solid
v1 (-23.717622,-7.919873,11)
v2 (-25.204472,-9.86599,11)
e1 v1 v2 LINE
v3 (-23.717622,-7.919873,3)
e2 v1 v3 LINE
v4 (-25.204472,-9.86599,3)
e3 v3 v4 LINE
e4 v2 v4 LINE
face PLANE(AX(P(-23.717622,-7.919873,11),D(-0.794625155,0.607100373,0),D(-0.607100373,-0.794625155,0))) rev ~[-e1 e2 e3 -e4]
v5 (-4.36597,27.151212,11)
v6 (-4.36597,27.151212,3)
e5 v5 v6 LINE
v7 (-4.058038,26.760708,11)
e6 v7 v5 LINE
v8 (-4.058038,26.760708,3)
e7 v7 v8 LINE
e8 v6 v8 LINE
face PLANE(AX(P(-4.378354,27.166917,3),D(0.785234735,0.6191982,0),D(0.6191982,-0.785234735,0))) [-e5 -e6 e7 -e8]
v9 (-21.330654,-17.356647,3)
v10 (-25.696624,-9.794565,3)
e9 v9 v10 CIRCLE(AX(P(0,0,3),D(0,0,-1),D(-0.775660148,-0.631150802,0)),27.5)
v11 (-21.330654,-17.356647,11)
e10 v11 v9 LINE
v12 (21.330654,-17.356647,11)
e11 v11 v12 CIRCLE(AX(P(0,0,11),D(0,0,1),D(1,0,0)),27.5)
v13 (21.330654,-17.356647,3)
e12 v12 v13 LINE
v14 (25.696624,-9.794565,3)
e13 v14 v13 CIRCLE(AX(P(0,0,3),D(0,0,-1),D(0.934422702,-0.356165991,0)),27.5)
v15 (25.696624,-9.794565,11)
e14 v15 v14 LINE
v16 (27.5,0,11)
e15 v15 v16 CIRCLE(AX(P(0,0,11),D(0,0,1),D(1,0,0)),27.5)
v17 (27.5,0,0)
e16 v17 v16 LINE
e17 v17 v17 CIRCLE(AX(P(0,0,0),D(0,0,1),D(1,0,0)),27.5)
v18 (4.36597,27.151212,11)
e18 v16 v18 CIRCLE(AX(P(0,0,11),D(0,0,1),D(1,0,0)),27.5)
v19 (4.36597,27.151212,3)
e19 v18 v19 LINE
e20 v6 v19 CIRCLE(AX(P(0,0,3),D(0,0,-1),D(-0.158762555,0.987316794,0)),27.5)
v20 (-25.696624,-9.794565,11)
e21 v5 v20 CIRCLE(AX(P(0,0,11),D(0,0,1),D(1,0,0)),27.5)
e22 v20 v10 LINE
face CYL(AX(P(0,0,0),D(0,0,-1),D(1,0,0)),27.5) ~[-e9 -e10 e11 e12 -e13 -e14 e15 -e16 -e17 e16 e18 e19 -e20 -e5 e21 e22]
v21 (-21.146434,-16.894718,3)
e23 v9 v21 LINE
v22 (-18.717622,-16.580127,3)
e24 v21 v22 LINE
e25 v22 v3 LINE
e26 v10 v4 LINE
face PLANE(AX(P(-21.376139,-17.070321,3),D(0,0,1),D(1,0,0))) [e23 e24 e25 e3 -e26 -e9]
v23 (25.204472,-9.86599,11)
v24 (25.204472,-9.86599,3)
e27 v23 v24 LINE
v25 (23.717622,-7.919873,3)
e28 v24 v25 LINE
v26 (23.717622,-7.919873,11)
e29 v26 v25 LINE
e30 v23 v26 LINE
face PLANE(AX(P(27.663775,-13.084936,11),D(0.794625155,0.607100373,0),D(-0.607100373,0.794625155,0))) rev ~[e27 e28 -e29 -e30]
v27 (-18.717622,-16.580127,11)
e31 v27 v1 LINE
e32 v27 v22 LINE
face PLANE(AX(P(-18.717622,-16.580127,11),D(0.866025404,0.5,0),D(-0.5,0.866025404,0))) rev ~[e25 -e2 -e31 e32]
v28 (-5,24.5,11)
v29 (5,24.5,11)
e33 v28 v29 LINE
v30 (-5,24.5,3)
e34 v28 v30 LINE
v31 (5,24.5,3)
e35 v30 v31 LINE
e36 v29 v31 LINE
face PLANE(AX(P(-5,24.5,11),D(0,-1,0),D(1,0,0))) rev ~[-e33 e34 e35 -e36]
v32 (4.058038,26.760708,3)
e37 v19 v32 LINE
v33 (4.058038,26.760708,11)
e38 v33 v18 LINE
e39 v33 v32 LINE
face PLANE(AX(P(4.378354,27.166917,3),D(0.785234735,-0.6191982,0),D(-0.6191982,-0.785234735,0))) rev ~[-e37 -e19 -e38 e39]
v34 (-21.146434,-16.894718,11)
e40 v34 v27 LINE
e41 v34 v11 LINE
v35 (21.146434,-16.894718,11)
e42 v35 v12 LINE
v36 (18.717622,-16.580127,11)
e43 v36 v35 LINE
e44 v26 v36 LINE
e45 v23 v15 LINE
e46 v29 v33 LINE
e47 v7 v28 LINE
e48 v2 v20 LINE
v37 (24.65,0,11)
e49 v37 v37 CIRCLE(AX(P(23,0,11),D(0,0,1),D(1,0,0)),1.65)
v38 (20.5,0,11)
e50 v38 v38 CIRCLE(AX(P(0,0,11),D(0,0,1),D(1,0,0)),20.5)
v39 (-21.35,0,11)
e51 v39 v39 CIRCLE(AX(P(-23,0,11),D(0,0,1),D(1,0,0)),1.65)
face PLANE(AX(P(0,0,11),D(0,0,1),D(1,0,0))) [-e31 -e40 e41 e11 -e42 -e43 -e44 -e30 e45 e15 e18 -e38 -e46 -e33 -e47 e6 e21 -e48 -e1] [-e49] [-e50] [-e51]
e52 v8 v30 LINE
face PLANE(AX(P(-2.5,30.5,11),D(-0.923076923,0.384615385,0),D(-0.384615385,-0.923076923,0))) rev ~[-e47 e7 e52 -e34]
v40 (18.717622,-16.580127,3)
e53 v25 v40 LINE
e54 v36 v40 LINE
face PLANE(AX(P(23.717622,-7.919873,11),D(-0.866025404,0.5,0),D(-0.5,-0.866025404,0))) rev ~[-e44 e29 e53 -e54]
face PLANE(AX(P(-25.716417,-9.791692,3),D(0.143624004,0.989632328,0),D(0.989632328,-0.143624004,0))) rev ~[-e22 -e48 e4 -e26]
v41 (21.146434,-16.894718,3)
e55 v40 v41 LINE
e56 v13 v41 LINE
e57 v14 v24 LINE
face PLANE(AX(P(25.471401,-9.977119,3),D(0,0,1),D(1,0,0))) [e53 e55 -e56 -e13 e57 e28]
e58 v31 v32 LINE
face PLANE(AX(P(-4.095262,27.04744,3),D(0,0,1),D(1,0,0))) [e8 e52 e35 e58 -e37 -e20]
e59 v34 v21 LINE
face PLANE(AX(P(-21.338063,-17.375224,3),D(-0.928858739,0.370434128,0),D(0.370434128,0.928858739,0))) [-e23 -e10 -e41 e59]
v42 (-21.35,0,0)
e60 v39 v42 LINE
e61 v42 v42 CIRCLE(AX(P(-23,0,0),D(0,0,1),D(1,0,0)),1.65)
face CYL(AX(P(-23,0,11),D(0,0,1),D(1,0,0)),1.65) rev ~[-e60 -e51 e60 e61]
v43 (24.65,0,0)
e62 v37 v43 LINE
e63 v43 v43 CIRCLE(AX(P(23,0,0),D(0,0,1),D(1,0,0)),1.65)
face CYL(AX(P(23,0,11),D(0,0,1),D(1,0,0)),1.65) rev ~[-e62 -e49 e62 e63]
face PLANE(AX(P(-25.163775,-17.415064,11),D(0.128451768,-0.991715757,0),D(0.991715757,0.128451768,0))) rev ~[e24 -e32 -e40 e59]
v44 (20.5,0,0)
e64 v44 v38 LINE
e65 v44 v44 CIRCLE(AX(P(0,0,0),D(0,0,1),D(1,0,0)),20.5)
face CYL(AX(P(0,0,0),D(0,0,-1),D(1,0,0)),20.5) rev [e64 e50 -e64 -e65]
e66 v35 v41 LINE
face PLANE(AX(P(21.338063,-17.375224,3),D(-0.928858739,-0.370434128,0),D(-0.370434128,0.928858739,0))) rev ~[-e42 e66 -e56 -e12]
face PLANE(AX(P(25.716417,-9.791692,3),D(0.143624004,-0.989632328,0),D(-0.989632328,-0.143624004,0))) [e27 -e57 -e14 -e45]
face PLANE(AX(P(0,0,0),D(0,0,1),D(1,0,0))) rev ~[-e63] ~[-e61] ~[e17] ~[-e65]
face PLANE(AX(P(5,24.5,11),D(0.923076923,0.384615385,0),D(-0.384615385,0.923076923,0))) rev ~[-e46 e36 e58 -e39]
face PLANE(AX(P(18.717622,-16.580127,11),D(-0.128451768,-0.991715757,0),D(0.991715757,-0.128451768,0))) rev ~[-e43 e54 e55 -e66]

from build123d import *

# Parameters (mm, degrees)
F0_R        = 27.5
F0_R_2      = 20.5
F1_DEPTH    = 11
F2_R        = 1.65
F3_DEPTH    = 11.001
F5_DEPTH    = 8
F6_T1_DEPTH = 9.2955577349


# Not quite as in the source:
# - a fillet or chamfer that OpenCascade refuses, or shapes differently, is made with other operations: its cross-section is extruded or revolved along the edge and cut away or added


with BuildPart() as f1:
    # F0 (on Top) → F1 (new body)
    with BuildSketch(Plane.XY):
        Circle(F0_R)
        Circle(F0_R_2, mode=Mode.SUBTRACT)
    extrude(amount=F1_DEPTH)

    # F2 (on face) → F3 (cut, through all)
    with BuildSketch(Plane.XY.offset(11)):
        with Locations((-23, 0)):
            Circle(F2_R)
        with Locations((23, 0)):
            Circle(F2_R)
    extrude(amount=-F3_DEPTH, mode=Mode.SUBTRACT)

    # F4 (on face) → F5 (cut)
    with BuildSketch(Plane.XY.offset(11)):
        Polygon((2.5, 30.5), (-2.5, 30.5), (-5, 24.5), (5, 24.5), align=None)
        Polygon((-27.6637748154, -13.0849364905), (-25.1637748154, -17.4150635095), (-18.7176223927, -16.5801270189), (-23.7176223927, -7.9198729811), align=None)
        Polygon((25.1637748154, -17.4150635095), (27.6637748154, -13.0849364905), (23.7176223927, -7.9198729811), (18.7176223927, -16.5801270189), align=None)
    extrude(amount=-F5_DEPTH, mode=Mode.SUBTRACT)

    # F6: chamfer of 0.5 on 6 edges, made by hand

    # F6_s2 → F6_t1 (cut)
    with BuildSketch(Plane.XY.offset(3)):
        with BuildLine():
            Line((4.3783542155, 27.1669165233), (4.0456541802, 26.7450037593))
            Line((4.0456541802, 26.7450037593), (4.0364234109, 26.7411576055))
            ThreePointArc((4.0364234109, 26.7411576055), (3.953486728, 26.9856318529), (3.8544223971, 27.223386247))
            Line((3.8544223971, 27.223386247), (3.8650581311, 27.2371332126))
            ThreePointArc((3.8650581311, 27.2371332126), (4.1213755716, 27.1995287348), (4.3799418411, 27.1767896913))
            Line((4.3799418411, 27.1767896913), (4.3783542155, 27.1669165233))
        make_face()
        with BuildLine():
            Line((-4.3783542155, 27.1669165233), (-4.0456541802, 26.7450037593))
            Line((-4.0456541802, 26.7450037593), (-4.0364234109, 26.7411576055))
            ThreePointArc((-4.0364234109, 26.7411576055), (-3.953486728, 26.9856318529), (-3.8544223971, 27.223386247))
            Line((-3.8544223971, 27.223386247), (-3.8650581311, 27.2371332126))
            ThreePointArc((-3.8650581311, 27.2371332126), (-4.1213755716, 27.1995287348), (-4.3799418411, 27.1767896913))
            Line((-4.3799418411, 27.1767896913), (-4.3783542155, 27.1669165233))
        make_face()
        with BuildLine():
            Line((25.7164169594, -9.7916922843), (25.18467977, -9.8688625847))
            Line((25.18467977, -9.8688625847), (25.1767335184, -9.8749335884))
            ThreePointArc((25.1767335184, -9.8749335884), (25.3469860858, -10.0689959865), (25.5033552655, -10.2736654107))
            Line((25.5033552655, -10.2736654107), (25.520578354, -10.2713280777))
            ThreePointArc((25.520578354, -10.2713280777), (25.6161706411, -10.0305484239), (25.7257611865, -9.7952539442))
            Line((25.7257611865, -9.7952539442), (25.7164169594, -9.7916922843))
        make_face()
        with BuildLine():
            Line((21.3380627439, -17.3752242391), (21.1390255898, -16.8761411746))
            Line((21.1390255898, -16.8761411746), (21.1403101075, -16.866224017))
            ThreePointArc((21.1403101075, -16.866224017), (21.3934993578, -16.9166358664), (21.6489328684, -16.9497208363))
            Line((21.6489328684, -16.9497208363), (21.6555202229, -16.965805135))
            ThreePointArc((21.6555202229, -16.965805135), (21.4947950695, -17.168980311), (21.3458193454, -17.3815357471))
            Line((21.3458193454, -17.3815357471), (21.3380627439, -17.3752242391))
        make_face()
        with BuildLine():
            Line((-25.7164169594, -9.7916922843), (-25.18467977, -9.8688625847))
            Line((-25.18467977, -9.8688625847), (-25.1767335184, -9.8749335884))
            ThreePointArc((-25.1767335184, -9.8749335884), (-25.3469860858, -10.0689959865), (-25.5033552655, -10.2736654107))
            Line((-25.5033552655, -10.2736654107), (-25.520578354, -10.2713280777))
            ThreePointArc((-25.520578354, -10.2713280777), (-25.6161706411, -10.0305484239), (-25.7257611865, -9.7952539442))
            Line((-25.7257611865, -9.7952539442), (-25.7164169594, -9.7916922843))
        make_face()
        with BuildLine():
            Line((-21.3380627439, -17.3752242391), (-21.1390255898, -16.8761411746))
            Line((-21.1390255898, -16.8761411746), (-21.1403101075, -16.866224017))
            ThreePointArc((-21.1403101075, -16.866224017), (-21.3934993578, -16.9166358664), (-21.6489328684, -16.9497208363))
            Line((-21.6489328684, -16.9497208363), (-21.6555202229, -16.965805135))
            ThreePointArc((-21.6555202229, -16.965805135), (-21.4947950695, -17.168980311), (-21.3458193454, -17.3815357471))
            Line((-21.3458193454, -17.3815357471), (-21.3380627439, -17.3752242391))
        make_face()
    extrude(amount=F6_T1_DEPTH, mode=Mode.SUBTRACT)


solid = f1.part
